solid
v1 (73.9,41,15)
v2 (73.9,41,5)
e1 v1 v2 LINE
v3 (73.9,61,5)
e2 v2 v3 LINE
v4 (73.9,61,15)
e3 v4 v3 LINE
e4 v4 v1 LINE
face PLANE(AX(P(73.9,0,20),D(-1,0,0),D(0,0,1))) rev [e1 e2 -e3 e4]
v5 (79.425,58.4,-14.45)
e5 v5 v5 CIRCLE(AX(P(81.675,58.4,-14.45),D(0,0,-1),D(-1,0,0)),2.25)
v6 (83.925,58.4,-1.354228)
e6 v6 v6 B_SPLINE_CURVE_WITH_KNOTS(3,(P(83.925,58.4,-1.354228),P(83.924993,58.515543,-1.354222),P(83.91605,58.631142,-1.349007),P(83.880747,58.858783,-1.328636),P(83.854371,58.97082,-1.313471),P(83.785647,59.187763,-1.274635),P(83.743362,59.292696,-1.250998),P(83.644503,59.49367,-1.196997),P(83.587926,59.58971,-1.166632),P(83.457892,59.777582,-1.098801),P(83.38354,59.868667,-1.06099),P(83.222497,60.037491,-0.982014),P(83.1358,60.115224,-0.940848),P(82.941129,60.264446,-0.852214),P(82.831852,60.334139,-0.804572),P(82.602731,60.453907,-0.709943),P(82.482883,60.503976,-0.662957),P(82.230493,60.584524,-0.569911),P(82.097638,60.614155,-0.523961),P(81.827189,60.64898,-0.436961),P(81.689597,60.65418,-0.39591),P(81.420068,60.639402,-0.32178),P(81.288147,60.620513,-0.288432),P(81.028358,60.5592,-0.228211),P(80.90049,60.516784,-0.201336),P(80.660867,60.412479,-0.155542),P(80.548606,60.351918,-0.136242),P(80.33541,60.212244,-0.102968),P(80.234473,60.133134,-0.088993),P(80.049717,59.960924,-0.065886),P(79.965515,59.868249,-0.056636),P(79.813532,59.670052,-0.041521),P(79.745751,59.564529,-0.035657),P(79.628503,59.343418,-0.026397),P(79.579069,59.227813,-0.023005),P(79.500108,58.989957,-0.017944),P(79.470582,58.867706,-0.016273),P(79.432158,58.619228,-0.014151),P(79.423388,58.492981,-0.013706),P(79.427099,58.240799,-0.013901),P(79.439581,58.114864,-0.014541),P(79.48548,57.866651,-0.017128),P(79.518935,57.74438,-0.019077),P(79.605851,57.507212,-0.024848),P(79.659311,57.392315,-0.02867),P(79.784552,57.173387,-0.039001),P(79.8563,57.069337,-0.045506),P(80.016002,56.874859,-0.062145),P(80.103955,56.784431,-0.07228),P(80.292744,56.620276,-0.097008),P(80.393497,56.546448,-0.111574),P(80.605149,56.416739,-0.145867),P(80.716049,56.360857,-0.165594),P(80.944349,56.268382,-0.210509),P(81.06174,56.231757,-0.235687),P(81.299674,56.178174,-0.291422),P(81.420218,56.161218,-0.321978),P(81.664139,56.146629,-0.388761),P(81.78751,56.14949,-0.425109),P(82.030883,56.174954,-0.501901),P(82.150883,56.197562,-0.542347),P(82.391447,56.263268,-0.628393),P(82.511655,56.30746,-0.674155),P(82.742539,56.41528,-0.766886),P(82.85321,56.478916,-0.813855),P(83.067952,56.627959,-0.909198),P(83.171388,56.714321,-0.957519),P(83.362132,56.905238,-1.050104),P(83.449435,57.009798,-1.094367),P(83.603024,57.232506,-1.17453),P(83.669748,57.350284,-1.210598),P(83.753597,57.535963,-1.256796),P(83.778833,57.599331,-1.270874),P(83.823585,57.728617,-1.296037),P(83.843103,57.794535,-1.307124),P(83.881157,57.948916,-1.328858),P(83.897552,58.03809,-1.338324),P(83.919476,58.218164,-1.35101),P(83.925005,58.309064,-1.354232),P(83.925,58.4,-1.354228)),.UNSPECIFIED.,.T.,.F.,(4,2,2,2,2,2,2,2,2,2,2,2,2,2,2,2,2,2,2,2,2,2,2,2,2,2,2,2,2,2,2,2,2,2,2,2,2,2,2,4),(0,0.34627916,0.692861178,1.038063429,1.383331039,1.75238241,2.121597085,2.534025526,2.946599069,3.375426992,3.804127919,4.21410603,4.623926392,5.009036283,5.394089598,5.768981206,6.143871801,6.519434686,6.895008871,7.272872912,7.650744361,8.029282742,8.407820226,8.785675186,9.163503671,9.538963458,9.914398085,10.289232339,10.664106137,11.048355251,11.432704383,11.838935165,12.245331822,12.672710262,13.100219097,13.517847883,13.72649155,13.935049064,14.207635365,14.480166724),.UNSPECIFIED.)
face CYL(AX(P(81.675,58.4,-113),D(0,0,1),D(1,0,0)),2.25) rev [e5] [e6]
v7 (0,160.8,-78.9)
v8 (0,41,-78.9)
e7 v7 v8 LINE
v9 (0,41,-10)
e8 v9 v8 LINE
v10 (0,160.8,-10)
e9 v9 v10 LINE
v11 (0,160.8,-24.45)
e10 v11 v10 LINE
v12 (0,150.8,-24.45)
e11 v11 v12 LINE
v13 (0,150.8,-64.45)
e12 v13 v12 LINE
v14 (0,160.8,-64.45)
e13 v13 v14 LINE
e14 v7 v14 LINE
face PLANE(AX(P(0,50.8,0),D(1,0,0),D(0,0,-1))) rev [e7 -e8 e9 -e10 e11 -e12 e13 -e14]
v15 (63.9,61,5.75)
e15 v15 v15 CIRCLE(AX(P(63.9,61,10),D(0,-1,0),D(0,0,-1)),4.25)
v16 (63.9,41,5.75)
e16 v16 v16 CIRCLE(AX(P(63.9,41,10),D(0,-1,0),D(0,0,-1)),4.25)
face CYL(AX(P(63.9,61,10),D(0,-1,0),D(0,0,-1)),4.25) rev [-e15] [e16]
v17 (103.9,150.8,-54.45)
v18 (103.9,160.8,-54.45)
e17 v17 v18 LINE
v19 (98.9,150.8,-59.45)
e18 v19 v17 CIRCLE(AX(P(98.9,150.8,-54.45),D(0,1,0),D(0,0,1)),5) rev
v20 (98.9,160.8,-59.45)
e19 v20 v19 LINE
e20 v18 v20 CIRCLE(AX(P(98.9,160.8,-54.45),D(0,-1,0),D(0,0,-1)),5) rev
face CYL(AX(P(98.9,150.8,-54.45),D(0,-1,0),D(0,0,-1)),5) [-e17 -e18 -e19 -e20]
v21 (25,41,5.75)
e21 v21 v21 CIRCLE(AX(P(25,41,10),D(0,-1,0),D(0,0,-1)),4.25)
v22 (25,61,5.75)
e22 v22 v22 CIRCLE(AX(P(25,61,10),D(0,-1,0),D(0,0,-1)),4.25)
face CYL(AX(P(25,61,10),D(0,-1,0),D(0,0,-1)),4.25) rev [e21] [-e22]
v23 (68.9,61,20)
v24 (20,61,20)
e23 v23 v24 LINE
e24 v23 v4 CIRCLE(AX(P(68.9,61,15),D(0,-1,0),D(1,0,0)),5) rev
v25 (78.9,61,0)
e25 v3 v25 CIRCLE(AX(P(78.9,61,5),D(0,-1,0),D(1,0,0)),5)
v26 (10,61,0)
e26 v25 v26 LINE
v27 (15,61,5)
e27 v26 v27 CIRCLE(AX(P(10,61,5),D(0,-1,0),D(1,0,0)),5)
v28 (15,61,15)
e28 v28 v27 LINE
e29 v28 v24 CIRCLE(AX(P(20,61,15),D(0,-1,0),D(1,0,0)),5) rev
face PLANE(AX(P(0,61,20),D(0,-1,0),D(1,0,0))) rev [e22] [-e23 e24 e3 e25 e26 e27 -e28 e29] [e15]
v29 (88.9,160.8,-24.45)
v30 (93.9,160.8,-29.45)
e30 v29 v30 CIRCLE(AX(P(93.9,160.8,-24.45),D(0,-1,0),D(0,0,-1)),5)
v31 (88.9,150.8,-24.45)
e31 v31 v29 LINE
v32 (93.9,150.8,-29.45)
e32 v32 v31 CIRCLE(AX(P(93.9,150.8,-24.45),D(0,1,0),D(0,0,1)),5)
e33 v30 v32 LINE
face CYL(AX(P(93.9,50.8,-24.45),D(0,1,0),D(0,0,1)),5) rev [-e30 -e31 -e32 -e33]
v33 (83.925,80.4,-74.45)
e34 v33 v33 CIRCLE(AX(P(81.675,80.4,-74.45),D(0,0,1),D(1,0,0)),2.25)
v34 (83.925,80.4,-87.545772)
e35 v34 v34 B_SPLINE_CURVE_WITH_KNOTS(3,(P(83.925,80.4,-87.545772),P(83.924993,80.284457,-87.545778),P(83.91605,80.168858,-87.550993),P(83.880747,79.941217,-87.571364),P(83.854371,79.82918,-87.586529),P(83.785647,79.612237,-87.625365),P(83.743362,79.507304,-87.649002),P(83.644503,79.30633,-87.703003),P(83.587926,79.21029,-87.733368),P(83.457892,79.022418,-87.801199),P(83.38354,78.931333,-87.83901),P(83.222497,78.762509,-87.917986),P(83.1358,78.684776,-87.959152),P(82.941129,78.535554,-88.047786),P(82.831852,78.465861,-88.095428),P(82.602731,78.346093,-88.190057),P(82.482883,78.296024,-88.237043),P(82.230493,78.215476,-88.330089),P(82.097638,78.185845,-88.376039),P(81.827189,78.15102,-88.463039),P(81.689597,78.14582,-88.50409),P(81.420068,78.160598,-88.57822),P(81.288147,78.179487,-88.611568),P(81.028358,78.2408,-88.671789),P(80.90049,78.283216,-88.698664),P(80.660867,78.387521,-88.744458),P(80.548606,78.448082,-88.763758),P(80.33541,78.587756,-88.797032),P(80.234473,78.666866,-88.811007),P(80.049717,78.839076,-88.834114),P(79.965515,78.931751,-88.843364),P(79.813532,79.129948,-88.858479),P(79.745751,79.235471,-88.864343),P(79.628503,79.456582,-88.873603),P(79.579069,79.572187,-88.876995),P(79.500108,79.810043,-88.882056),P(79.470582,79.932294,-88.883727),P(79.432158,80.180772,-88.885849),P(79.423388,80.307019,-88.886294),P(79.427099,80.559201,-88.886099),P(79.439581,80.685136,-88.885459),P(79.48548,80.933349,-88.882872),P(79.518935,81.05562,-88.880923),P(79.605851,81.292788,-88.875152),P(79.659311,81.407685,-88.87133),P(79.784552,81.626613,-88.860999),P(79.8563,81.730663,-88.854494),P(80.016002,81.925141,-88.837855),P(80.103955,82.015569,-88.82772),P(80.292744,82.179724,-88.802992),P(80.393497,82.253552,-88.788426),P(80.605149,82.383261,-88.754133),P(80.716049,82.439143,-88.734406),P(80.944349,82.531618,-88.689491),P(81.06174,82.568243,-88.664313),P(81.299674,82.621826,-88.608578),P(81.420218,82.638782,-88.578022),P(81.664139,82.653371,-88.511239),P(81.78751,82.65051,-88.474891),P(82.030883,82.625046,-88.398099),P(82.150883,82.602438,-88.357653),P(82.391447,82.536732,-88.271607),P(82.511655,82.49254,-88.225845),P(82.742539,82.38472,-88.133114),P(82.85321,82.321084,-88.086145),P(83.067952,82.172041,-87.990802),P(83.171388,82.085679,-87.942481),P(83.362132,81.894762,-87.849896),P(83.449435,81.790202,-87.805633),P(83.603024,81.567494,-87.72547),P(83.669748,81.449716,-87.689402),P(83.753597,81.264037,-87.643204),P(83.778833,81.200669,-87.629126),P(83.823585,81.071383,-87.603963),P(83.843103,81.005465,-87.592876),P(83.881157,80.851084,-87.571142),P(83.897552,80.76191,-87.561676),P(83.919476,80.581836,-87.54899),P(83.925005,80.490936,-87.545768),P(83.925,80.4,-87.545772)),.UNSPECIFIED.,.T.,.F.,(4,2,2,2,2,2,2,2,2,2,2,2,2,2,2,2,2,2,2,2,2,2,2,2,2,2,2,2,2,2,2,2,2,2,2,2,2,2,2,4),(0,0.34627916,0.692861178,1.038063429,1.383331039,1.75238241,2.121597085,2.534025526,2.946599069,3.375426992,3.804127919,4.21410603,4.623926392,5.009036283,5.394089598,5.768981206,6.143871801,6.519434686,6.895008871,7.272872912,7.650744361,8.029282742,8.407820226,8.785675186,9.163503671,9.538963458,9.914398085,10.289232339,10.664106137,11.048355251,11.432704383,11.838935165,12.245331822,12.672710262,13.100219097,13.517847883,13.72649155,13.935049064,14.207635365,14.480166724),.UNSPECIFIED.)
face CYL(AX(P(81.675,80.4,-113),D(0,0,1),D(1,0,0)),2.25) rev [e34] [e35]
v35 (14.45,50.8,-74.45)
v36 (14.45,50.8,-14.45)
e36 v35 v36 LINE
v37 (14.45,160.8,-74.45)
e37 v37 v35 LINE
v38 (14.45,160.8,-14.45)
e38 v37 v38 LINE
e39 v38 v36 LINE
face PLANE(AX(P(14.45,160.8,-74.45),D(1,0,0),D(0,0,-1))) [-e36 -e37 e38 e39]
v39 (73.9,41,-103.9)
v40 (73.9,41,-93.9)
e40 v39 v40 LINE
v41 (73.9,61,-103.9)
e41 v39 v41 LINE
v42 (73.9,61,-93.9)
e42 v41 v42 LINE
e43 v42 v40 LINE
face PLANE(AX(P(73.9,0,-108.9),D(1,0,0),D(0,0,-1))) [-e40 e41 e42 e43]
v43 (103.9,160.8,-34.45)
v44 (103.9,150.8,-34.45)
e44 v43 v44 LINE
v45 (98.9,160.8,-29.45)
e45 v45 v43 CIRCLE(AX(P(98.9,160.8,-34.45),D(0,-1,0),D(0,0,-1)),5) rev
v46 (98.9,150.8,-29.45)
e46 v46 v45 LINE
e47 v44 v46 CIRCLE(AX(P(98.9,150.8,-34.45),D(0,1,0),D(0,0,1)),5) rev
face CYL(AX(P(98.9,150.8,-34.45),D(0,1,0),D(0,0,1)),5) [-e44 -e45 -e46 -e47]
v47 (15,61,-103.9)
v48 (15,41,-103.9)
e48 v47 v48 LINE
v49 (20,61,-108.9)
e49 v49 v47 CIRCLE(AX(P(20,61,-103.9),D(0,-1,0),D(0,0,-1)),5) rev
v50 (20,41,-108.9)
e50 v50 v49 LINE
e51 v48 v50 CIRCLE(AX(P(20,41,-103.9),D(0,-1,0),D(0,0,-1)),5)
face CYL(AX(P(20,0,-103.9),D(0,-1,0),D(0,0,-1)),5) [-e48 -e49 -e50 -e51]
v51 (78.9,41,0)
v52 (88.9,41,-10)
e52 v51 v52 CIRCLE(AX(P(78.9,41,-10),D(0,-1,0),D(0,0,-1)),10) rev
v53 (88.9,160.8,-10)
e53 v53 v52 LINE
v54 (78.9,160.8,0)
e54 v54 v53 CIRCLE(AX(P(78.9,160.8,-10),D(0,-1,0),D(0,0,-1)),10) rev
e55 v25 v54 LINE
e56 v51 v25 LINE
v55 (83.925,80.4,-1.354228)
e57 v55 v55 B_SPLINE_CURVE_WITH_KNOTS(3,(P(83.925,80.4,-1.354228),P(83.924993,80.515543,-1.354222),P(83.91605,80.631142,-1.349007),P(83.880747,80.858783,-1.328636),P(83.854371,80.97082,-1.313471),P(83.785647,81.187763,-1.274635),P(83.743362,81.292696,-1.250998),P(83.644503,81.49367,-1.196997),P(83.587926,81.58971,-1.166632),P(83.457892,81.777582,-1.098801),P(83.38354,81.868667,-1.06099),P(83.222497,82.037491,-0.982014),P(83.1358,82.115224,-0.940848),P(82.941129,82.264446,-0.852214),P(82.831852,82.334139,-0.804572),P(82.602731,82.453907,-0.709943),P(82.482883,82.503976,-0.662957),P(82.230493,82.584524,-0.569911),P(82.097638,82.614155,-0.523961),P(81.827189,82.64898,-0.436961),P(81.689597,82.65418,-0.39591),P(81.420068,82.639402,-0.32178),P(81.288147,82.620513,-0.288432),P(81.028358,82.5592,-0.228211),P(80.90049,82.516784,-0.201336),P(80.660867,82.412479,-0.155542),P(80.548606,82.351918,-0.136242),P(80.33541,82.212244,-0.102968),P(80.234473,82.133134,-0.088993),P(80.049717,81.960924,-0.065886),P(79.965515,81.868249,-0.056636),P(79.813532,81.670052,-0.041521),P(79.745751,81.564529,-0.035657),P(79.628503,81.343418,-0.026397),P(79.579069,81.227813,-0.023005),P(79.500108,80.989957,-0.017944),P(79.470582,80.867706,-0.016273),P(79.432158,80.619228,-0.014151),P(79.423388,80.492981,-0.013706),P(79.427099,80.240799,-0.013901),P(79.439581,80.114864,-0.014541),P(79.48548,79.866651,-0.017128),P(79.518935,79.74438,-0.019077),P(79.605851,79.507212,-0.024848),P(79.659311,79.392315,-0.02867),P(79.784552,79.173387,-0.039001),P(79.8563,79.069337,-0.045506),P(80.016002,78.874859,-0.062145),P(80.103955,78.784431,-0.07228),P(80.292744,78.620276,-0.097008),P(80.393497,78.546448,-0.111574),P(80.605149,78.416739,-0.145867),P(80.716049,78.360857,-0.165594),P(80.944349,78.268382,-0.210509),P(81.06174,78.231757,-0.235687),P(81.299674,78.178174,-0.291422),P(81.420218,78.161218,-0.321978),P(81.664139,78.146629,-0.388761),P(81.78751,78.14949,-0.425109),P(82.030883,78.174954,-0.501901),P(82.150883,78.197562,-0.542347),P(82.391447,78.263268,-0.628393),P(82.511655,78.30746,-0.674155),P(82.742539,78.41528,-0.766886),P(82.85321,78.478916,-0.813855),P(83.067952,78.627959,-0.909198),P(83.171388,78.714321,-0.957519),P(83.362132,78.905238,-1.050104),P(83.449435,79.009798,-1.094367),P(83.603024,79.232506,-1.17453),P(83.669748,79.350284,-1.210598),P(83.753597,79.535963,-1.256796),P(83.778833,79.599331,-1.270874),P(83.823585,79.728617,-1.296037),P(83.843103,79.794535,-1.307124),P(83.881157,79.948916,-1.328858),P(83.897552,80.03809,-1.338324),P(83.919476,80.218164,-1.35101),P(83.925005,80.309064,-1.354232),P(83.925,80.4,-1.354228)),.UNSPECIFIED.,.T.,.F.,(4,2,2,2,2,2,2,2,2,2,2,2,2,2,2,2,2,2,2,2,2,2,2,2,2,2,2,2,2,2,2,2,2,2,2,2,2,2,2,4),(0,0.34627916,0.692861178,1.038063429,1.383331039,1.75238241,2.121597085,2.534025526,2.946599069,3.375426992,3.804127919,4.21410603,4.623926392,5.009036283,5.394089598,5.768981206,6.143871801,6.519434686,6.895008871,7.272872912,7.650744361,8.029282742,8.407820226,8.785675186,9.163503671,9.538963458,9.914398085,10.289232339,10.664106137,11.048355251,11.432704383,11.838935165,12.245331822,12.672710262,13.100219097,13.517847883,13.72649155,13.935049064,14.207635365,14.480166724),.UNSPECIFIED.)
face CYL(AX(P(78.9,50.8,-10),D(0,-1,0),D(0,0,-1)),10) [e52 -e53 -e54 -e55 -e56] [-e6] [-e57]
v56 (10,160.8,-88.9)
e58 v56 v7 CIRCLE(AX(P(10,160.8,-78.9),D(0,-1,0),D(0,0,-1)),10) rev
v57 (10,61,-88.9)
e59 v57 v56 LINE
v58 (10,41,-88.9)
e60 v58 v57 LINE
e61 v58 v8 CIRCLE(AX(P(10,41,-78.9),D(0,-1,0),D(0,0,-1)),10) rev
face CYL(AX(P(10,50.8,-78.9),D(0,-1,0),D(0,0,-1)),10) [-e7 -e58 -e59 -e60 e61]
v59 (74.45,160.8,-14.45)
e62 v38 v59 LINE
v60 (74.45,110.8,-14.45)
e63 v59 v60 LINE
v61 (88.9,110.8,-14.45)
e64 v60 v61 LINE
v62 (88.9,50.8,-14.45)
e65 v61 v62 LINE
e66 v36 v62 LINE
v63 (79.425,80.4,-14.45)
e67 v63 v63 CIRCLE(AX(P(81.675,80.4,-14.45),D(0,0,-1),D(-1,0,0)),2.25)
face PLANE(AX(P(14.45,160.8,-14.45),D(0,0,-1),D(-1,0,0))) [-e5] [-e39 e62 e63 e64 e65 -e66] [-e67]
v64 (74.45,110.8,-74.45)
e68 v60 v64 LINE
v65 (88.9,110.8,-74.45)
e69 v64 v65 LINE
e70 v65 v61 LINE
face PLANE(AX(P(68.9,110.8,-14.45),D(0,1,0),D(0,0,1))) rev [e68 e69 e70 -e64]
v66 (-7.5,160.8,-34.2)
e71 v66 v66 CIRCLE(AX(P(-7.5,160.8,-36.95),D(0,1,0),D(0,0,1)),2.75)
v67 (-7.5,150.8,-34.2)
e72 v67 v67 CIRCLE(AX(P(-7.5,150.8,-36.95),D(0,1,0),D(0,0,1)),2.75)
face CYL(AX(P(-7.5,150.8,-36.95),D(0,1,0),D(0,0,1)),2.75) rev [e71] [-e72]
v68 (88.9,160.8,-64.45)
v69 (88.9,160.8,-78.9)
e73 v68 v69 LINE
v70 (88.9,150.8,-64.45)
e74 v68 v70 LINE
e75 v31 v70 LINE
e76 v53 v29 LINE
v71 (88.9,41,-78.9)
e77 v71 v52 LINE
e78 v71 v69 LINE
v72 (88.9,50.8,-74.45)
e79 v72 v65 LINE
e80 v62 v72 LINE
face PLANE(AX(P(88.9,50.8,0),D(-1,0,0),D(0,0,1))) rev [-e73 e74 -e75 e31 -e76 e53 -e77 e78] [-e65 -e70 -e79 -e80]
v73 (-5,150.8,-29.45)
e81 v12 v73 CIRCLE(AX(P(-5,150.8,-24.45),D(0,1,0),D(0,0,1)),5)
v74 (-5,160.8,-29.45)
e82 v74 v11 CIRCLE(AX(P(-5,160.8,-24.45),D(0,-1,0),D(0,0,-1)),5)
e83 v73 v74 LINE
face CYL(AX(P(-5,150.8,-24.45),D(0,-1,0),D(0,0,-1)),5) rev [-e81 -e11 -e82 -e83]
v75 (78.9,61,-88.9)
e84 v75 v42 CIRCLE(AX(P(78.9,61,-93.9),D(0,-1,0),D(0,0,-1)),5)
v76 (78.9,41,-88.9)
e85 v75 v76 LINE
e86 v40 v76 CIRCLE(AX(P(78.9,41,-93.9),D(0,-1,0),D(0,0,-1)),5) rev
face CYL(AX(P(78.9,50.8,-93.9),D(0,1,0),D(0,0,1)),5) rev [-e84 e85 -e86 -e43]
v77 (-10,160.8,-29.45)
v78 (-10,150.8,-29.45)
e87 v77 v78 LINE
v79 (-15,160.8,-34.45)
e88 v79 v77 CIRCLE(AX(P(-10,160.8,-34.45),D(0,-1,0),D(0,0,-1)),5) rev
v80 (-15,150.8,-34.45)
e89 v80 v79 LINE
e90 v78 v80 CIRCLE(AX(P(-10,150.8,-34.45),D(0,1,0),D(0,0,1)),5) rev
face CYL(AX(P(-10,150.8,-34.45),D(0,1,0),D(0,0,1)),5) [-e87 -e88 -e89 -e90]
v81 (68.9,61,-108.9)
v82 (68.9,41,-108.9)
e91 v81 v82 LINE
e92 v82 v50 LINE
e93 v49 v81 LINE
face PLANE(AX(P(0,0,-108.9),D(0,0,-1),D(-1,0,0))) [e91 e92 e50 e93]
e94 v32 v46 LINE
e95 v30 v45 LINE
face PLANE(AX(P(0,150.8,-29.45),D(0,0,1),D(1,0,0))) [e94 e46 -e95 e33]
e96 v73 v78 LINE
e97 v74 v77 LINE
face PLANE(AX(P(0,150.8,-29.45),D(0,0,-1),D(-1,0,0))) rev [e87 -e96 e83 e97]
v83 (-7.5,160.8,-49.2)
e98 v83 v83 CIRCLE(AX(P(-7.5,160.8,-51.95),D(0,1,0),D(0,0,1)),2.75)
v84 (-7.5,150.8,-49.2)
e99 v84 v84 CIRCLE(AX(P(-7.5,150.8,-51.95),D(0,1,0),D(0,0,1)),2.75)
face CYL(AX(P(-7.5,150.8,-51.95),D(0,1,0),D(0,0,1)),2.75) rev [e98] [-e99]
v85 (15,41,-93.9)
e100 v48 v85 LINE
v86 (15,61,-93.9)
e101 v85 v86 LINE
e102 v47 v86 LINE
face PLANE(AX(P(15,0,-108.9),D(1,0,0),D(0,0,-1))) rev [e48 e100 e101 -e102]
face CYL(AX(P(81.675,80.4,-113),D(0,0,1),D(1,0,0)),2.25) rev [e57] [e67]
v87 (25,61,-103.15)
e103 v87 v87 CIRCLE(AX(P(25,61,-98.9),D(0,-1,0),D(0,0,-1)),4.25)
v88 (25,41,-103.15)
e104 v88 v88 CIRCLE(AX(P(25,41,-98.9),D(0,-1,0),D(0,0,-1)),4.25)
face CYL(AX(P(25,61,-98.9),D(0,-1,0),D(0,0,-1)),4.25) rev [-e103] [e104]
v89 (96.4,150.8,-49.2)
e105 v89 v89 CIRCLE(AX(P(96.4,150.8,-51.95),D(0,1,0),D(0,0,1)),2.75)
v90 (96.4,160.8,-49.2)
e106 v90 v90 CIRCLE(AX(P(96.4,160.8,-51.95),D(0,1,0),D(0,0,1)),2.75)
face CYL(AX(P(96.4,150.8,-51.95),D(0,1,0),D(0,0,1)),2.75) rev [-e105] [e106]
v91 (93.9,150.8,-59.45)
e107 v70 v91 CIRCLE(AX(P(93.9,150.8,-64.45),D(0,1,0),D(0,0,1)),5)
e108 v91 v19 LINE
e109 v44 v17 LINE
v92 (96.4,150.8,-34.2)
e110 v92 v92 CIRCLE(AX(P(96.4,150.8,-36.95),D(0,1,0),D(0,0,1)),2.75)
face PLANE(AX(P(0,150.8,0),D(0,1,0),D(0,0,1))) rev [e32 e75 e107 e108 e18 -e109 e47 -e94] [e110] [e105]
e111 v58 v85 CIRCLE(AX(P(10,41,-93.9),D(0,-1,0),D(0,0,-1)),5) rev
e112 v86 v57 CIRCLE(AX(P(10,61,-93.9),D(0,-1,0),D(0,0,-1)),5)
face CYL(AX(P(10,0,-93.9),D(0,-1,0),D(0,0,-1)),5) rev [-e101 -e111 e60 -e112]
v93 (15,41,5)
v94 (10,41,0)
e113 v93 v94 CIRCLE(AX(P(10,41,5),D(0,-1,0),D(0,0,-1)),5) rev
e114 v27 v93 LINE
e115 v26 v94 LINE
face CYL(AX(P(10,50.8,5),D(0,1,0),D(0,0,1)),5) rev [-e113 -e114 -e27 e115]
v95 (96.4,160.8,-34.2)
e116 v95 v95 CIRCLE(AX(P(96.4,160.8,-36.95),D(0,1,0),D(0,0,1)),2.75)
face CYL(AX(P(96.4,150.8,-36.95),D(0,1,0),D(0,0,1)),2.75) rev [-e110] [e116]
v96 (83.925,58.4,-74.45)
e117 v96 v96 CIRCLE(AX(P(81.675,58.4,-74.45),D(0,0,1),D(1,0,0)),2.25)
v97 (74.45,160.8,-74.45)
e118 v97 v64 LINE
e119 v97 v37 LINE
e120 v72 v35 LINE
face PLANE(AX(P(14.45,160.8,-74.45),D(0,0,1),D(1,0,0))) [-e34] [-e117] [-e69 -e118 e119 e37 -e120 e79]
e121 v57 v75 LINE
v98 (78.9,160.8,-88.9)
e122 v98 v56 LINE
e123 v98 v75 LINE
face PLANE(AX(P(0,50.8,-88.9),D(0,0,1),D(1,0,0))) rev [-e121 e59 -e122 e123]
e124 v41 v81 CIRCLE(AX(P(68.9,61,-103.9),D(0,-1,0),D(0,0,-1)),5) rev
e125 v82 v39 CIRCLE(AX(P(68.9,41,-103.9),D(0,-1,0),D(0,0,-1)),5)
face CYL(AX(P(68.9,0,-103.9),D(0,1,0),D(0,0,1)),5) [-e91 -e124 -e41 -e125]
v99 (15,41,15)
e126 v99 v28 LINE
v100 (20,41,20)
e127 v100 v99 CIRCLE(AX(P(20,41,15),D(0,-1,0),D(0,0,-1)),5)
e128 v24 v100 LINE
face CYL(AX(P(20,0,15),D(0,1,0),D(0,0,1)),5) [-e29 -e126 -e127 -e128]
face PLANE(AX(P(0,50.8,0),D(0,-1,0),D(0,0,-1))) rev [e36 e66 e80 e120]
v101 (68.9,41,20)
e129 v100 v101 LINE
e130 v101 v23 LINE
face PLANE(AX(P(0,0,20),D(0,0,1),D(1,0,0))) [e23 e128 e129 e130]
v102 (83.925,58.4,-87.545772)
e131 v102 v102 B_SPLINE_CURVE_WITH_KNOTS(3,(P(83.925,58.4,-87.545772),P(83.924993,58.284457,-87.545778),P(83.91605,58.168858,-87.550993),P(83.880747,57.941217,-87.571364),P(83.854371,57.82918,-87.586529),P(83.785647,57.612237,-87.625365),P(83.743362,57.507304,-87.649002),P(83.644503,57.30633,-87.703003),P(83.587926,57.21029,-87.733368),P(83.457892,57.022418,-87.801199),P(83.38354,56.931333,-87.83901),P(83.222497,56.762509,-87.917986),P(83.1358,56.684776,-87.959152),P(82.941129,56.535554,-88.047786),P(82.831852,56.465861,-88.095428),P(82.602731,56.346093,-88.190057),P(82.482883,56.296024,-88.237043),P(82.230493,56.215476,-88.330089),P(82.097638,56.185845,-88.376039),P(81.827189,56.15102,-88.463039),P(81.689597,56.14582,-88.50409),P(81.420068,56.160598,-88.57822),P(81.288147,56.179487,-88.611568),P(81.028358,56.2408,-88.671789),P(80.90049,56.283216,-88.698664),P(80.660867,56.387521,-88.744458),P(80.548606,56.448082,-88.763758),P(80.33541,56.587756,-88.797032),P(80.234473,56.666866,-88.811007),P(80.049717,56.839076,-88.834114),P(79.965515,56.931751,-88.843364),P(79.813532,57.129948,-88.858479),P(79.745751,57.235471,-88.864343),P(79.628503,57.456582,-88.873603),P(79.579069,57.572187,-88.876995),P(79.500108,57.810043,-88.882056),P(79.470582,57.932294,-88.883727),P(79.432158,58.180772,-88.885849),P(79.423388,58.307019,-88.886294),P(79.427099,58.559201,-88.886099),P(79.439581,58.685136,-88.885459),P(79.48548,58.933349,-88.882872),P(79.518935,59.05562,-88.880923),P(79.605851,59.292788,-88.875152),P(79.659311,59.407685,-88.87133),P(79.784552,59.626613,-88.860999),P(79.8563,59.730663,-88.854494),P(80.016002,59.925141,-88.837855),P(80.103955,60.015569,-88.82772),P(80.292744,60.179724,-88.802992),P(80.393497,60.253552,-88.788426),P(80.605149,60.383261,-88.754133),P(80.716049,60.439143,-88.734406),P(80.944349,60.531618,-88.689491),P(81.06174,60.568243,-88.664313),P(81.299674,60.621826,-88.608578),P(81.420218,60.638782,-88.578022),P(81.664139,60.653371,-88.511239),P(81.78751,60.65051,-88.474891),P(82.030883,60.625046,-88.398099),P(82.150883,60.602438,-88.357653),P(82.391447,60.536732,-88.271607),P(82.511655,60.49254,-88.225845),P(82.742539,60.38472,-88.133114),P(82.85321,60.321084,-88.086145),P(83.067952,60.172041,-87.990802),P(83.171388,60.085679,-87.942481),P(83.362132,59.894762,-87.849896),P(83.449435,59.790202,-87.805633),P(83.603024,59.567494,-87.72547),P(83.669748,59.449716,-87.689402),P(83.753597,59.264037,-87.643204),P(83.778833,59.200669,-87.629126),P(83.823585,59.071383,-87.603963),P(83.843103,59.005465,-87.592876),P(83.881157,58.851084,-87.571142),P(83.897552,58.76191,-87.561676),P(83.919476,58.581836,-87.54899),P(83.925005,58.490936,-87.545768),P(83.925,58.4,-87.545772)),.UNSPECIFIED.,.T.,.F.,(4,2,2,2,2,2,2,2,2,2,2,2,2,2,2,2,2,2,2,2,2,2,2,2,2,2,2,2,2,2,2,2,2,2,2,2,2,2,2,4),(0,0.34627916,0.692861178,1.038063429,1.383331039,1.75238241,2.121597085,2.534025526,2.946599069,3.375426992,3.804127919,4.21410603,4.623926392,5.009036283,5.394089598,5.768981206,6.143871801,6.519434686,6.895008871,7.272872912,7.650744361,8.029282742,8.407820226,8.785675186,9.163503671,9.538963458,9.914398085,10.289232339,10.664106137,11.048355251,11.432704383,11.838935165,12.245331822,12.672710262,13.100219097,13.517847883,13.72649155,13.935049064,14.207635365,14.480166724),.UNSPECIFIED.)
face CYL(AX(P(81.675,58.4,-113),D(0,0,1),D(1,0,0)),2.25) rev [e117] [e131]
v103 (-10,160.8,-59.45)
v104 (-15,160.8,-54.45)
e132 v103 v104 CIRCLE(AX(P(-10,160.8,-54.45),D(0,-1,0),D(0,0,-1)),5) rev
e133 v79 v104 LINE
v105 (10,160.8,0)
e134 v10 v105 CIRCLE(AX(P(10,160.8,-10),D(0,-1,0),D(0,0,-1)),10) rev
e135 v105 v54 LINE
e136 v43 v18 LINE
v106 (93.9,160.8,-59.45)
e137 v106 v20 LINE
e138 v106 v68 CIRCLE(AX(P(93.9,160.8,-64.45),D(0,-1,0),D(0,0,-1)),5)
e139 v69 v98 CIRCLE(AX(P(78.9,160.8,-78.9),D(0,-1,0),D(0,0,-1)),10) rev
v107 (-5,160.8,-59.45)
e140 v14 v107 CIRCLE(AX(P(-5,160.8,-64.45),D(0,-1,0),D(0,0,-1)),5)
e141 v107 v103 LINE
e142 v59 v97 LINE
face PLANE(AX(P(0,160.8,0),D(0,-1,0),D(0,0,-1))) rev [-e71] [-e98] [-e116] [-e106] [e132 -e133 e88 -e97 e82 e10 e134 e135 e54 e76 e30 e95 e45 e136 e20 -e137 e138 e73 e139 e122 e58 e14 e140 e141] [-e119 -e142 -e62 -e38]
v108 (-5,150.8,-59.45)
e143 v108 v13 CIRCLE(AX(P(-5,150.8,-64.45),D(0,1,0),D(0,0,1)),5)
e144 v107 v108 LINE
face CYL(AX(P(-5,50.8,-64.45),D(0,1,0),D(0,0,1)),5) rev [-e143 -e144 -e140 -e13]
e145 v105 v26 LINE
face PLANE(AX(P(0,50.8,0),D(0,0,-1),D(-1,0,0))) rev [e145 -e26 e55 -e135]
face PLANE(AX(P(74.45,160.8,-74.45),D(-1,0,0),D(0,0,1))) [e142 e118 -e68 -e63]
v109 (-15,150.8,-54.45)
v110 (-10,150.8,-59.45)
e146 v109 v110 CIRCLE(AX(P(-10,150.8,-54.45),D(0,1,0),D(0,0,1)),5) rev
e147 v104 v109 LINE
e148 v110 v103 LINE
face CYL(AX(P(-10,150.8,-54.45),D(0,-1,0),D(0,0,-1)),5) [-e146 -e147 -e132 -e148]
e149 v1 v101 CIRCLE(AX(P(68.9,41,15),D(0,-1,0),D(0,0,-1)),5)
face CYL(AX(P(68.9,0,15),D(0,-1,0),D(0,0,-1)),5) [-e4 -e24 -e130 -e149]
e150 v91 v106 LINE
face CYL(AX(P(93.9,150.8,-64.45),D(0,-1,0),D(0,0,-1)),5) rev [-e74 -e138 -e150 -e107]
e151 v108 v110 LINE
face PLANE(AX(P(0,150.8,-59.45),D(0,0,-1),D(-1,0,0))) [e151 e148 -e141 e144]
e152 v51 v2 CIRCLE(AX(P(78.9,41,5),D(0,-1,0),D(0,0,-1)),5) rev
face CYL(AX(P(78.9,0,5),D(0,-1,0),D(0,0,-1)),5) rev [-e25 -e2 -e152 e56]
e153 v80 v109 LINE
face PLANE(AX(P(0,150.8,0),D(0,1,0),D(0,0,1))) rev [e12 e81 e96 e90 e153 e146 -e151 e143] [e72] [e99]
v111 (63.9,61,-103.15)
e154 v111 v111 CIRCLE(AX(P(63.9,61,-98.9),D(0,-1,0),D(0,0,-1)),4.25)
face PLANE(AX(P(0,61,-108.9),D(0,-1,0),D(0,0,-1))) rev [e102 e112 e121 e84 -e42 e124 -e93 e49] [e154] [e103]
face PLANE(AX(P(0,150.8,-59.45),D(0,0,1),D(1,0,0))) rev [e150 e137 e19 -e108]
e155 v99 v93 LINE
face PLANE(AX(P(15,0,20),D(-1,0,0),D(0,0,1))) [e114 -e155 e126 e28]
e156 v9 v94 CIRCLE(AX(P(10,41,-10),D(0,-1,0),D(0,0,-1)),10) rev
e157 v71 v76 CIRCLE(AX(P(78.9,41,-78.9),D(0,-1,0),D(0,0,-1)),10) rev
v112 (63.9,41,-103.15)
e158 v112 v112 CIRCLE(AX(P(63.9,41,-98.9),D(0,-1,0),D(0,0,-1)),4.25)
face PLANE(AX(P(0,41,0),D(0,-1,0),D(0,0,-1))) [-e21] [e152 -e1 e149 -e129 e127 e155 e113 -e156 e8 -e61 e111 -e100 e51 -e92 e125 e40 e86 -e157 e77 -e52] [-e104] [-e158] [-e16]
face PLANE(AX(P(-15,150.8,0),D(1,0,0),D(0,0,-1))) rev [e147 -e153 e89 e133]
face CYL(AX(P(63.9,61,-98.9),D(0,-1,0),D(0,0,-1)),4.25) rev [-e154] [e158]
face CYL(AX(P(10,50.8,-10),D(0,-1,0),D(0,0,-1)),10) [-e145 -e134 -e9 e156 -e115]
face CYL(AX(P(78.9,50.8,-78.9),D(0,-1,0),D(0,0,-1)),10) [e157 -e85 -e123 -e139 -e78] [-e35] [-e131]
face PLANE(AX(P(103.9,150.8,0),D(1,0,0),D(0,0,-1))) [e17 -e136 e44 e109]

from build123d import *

# Parameters (mm, degrees)
SKETCH3_W            = 88.9
SKETCH3_H            = 88.9
BOSS_EXTRUDE2_DEPTH  = 50.8
SKETCH13_R           = 4.25
CUT_EXTRUDE4_DEPTH   = 102
SKETCH30_W           = 88.9
SKETCH30_H           = 88.9
SKETCH30_W_2         = 60
SKETCH30_H_2         = 60
BOSS_EXTRUDE8_DEPTH  = 110
SKETCH31_W           = 15
SKETCH31_H           = 15
SKETCH31_R           = 2.75
BOSS_EXTRUDE10_DEPTH = 10
FILLET1_R            = 10
SKETCH33_W           = 60
SKETCH33_H           = 60
CUT_EXTRUDE5_DEPTH   = 20
SKETCH37_R           = 2.25
CUT_EXTRUDE6_DEPTH   = 113
SKETCH38_W           = 88.9
SKETCH38_H           = 88.9
CUT_EXTRUDE7_DEPTH   = 41
SKETCH39_W           = 29.45
SKETCH39_H           = 20
BOSS_EXTRUDE11_DEPTH = 20
SKETCH40_W           = 29.45
SKETCH40_H           = 20
BOSS_EXTRUDE12_DEPTH = 20
SKETCH41_R           = 4.25
CUT_EXTRUDE8_DEPTH   = 20
FILLET2_R            = 5
FILLET3_R            = 5


with BuildPart() as part:
    # Sketch3 → Boss-Extrude2 (new body)
    with BuildSketch(Plane(origin=(0, 0, 0), x_dir=(1, 0, 0), z_dir=(0, 1, 0))):
        with Locations((44.45, 44.45)):
            Rectangle(SKETCH3_W, SKETCH3_H)
    extrude(amount=BOSS_EXTRUDE2_DEPTH)

    # Sketch13 → Cut-Extrude4 (cut)
    with BuildSketch(Plane.XY):
        with Locations((44.45, 20)):
            Circle(SKETCH13_R)
    extrude(amount=-CUT_EXTRUDE4_DEPTH, mode=Mode.SUBTRACT)

    # Sketch30 → Boss-Extrude8 (add)
    with BuildSketch(Plane(origin=(0, 50.8, 0), x_dir=(1, 0, 0), z_dir=(0, 1, 0))):
        with Locations((44.45, 44.45)):
            Rectangle(SKETCH30_W, SKETCH30_H)
        with Locations((44.45, 44.45)):
            Rectangle(SKETCH30_W_2, SKETCH30_H_2, mode=Mode.SUBTRACT)
    extrude(amount=BOSS_EXTRUDE8_DEPTH)

    # Sketch31 → Boss-Extrude10 (add)
    # profile 1 of 4: a face of its own
    with BuildSketch(Plane(origin=(0, 160.8, 0), x_dir=(1, 0, 0), z_dir=(0, 1, 0))):
        with Locations((-7.5, 51.95)):
            Rectangle(SKETCH31_W, SKETCH31_H)
        with Locations(Location((-7.5, 51.95, 0), (0, 0, 270))):
            Circle(SKETCH31_R, mode=Mode.SUBTRACT)
    # profile 2 of 4: a face of its own
    with BuildSketch(Plane(origin=(0, 160.8, 0), x_dir=(1, 0, 0), z_dir=(0, 1, 0))):
        with Locations((-7.5, 36.95)):
            Rectangle(SKETCH31_W, SKETCH31_H)
        with Locations(Location((-7.5, 36.95, 0), (0, 0, 270))):
            Circle(SKETCH31_R, mode=Mode.SUBTRACT)
    # profile 3 of 4: a face of its own
    with BuildSketch(Plane(origin=(0, 160.8, 0), x_dir=(1, 0, 0), z_dir=(0, 1, 0))):
        with Locations((96.4, 51.95)):
            Rectangle(SKETCH31_W, SKETCH31_H)
        with Locations(Location((96.4, 51.95, 0), (0, 0, 270))):
            Circle(SKETCH31_R, mode=Mode.SUBTRACT)
    # profile 4 of 4: a face of its own
    with BuildSketch(Plane(origin=(0, 160.8, 0), x_dir=(1, 0, 0), z_dir=(0, 1, 0))):
        with Locations((96.4, 36.95)):
            Rectangle(SKETCH31_W, SKETCH31_H)
        with Locations(Location((96.4, 36.95, 0), (0, 0, 270))):
            Circle(SKETCH31_R, mode=Mode.SUBTRACT)
    extrude(amount=-BOSS_EXTRUDE10_DEPTH)

    # Fillet1
    fillet1_edges = [part.edges().sort_by_distance(p)[0] for p in [
        (0, 80.4, -88.9),
        (88.9, 80.4, -88.9),
        (88.9, 80.4, 0),
        (0, 80.4, 0),
    ]]
    fillet(fillet1_edges, radius=FILLET1_R)

    # Sketch33 → Cut-Extrude5 (cut)
    with BuildSketch(Plane(origin=(88.9, 0, 0), x_dir=(0, 0, -1), z_dir=(1, 0, 0))):
        with Locations((44.45, 80.8)):
            Rectangle(SKETCH33_W, SKETCH33_H)
    extrude(amount=-CUT_EXTRUDE5_DEPTH, mode=Mode.SUBTRACT)

    # Sketch37 → Cut-Extrude6 (cut)
    with BuildSketch(Plane.XY):
        with Locations((81.675, 80.4)):
            Circle(SKETCH37_R)
        with Locations((81.675, 58.4)):
            Circle(SKETCH37_R)
    extrude(amount=-CUT_EXTRUDE6_DEPTH, mode=Mode.SUBTRACT)

    # Sketch38 → Cut-Extrude7 (cut)
    with BuildSketch(Plane.XZ):
        with Locations((44.45, -44.45)):
            Rectangle(SKETCH38_W, SKETCH38_H)
    extrude(amount=-CUT_EXTRUDE7_DEPTH, mode=Mode.SUBTRACT)

    # Sketch39 → Boss-Extrude11 (add)
    with BuildSketch(Plane.XY):
        with Locations((29.725, 51)):
            Rectangle(SKETCH39_W, SKETCH39_H)
        with Locations((59.175, 51)):
            Rectangle(SKETCH39_W, SKETCH39_H)
    extrude(amount=BOSS_EXTRUDE11_DEPTH)

    # Sketch40 → Boss-Extrude12 (add)
    with BuildSketch(Plane(origin=(0, 0, -88.9), x_dir=(-1, 0, 0), z_dir=(0, 0, -1))):
        with Locations((-59.175, 51)):
            Rectangle(SKETCH40_W, SKETCH40_H)
        with Locations((-29.725, 51)):
            Rectangle(SKETCH40_W, SKETCH40_H)
    extrude(amount=BOSS_EXTRUDE12_DEPTH)

    # Sketch41 → Cut-Extrude8 (cut)
    with BuildSketch(Plane.XZ.offset(-41)):
        with Locations(Location((63.9, 10, 0), (0, 0, 270))):
            Circle(SKETCH41_R)
        with Locations(Location((25, 10, 0), (0, 0, 270))):
            Circle(SKETCH41_R)
        with Locations(Location((63.9, -98.9, 0), (0, 0, 270))):
            Circle(SKETCH41_R)
        with Locations(Location((25, -98.9, 0), (0, 0, 270))):
            Circle(SKETCH41_R)
    extrude(amount=-CUT_EXTRUDE8_DEPTH, mode=Mode.SUBTRACT)

    # Fillet2
    fillet2_edges = [part.edges().sort_by_distance(p)[0] for p in [
        (15, 51, -108.9),
        (15, 51, -88.9),
        (73.9, 51, -108.9),
        (73.9, 51, -88.9),
        (73.9, 51, 0),
        (15, 51, 0),
        (15, 51, 20),
        (73.9, 51, 20),
    ]]
    fillet(fillet2_edges, radius=FILLET2_R - 0.0001)  # a hair under: the kernel refuses the full size

    # Fillet3
    fillet3_edges = [part.edges().sort_by_distance(p)[0] for p in [
        (-15, 155.8, -29.45),
        (-15, 155.8, -59.45),
        (0, 155.8, -59.45),
        (0, 155.8, -29.45),
        (88.9, 155.8, -29.45),
        (88.9, 155.8, -59.45),
        (103.9, 155.8, -59.45),
        (103.9, 155.8, -29.45),
    ]]
    fillet(fillet3_edges, radius=FILLET3_R)


solid = part.part
